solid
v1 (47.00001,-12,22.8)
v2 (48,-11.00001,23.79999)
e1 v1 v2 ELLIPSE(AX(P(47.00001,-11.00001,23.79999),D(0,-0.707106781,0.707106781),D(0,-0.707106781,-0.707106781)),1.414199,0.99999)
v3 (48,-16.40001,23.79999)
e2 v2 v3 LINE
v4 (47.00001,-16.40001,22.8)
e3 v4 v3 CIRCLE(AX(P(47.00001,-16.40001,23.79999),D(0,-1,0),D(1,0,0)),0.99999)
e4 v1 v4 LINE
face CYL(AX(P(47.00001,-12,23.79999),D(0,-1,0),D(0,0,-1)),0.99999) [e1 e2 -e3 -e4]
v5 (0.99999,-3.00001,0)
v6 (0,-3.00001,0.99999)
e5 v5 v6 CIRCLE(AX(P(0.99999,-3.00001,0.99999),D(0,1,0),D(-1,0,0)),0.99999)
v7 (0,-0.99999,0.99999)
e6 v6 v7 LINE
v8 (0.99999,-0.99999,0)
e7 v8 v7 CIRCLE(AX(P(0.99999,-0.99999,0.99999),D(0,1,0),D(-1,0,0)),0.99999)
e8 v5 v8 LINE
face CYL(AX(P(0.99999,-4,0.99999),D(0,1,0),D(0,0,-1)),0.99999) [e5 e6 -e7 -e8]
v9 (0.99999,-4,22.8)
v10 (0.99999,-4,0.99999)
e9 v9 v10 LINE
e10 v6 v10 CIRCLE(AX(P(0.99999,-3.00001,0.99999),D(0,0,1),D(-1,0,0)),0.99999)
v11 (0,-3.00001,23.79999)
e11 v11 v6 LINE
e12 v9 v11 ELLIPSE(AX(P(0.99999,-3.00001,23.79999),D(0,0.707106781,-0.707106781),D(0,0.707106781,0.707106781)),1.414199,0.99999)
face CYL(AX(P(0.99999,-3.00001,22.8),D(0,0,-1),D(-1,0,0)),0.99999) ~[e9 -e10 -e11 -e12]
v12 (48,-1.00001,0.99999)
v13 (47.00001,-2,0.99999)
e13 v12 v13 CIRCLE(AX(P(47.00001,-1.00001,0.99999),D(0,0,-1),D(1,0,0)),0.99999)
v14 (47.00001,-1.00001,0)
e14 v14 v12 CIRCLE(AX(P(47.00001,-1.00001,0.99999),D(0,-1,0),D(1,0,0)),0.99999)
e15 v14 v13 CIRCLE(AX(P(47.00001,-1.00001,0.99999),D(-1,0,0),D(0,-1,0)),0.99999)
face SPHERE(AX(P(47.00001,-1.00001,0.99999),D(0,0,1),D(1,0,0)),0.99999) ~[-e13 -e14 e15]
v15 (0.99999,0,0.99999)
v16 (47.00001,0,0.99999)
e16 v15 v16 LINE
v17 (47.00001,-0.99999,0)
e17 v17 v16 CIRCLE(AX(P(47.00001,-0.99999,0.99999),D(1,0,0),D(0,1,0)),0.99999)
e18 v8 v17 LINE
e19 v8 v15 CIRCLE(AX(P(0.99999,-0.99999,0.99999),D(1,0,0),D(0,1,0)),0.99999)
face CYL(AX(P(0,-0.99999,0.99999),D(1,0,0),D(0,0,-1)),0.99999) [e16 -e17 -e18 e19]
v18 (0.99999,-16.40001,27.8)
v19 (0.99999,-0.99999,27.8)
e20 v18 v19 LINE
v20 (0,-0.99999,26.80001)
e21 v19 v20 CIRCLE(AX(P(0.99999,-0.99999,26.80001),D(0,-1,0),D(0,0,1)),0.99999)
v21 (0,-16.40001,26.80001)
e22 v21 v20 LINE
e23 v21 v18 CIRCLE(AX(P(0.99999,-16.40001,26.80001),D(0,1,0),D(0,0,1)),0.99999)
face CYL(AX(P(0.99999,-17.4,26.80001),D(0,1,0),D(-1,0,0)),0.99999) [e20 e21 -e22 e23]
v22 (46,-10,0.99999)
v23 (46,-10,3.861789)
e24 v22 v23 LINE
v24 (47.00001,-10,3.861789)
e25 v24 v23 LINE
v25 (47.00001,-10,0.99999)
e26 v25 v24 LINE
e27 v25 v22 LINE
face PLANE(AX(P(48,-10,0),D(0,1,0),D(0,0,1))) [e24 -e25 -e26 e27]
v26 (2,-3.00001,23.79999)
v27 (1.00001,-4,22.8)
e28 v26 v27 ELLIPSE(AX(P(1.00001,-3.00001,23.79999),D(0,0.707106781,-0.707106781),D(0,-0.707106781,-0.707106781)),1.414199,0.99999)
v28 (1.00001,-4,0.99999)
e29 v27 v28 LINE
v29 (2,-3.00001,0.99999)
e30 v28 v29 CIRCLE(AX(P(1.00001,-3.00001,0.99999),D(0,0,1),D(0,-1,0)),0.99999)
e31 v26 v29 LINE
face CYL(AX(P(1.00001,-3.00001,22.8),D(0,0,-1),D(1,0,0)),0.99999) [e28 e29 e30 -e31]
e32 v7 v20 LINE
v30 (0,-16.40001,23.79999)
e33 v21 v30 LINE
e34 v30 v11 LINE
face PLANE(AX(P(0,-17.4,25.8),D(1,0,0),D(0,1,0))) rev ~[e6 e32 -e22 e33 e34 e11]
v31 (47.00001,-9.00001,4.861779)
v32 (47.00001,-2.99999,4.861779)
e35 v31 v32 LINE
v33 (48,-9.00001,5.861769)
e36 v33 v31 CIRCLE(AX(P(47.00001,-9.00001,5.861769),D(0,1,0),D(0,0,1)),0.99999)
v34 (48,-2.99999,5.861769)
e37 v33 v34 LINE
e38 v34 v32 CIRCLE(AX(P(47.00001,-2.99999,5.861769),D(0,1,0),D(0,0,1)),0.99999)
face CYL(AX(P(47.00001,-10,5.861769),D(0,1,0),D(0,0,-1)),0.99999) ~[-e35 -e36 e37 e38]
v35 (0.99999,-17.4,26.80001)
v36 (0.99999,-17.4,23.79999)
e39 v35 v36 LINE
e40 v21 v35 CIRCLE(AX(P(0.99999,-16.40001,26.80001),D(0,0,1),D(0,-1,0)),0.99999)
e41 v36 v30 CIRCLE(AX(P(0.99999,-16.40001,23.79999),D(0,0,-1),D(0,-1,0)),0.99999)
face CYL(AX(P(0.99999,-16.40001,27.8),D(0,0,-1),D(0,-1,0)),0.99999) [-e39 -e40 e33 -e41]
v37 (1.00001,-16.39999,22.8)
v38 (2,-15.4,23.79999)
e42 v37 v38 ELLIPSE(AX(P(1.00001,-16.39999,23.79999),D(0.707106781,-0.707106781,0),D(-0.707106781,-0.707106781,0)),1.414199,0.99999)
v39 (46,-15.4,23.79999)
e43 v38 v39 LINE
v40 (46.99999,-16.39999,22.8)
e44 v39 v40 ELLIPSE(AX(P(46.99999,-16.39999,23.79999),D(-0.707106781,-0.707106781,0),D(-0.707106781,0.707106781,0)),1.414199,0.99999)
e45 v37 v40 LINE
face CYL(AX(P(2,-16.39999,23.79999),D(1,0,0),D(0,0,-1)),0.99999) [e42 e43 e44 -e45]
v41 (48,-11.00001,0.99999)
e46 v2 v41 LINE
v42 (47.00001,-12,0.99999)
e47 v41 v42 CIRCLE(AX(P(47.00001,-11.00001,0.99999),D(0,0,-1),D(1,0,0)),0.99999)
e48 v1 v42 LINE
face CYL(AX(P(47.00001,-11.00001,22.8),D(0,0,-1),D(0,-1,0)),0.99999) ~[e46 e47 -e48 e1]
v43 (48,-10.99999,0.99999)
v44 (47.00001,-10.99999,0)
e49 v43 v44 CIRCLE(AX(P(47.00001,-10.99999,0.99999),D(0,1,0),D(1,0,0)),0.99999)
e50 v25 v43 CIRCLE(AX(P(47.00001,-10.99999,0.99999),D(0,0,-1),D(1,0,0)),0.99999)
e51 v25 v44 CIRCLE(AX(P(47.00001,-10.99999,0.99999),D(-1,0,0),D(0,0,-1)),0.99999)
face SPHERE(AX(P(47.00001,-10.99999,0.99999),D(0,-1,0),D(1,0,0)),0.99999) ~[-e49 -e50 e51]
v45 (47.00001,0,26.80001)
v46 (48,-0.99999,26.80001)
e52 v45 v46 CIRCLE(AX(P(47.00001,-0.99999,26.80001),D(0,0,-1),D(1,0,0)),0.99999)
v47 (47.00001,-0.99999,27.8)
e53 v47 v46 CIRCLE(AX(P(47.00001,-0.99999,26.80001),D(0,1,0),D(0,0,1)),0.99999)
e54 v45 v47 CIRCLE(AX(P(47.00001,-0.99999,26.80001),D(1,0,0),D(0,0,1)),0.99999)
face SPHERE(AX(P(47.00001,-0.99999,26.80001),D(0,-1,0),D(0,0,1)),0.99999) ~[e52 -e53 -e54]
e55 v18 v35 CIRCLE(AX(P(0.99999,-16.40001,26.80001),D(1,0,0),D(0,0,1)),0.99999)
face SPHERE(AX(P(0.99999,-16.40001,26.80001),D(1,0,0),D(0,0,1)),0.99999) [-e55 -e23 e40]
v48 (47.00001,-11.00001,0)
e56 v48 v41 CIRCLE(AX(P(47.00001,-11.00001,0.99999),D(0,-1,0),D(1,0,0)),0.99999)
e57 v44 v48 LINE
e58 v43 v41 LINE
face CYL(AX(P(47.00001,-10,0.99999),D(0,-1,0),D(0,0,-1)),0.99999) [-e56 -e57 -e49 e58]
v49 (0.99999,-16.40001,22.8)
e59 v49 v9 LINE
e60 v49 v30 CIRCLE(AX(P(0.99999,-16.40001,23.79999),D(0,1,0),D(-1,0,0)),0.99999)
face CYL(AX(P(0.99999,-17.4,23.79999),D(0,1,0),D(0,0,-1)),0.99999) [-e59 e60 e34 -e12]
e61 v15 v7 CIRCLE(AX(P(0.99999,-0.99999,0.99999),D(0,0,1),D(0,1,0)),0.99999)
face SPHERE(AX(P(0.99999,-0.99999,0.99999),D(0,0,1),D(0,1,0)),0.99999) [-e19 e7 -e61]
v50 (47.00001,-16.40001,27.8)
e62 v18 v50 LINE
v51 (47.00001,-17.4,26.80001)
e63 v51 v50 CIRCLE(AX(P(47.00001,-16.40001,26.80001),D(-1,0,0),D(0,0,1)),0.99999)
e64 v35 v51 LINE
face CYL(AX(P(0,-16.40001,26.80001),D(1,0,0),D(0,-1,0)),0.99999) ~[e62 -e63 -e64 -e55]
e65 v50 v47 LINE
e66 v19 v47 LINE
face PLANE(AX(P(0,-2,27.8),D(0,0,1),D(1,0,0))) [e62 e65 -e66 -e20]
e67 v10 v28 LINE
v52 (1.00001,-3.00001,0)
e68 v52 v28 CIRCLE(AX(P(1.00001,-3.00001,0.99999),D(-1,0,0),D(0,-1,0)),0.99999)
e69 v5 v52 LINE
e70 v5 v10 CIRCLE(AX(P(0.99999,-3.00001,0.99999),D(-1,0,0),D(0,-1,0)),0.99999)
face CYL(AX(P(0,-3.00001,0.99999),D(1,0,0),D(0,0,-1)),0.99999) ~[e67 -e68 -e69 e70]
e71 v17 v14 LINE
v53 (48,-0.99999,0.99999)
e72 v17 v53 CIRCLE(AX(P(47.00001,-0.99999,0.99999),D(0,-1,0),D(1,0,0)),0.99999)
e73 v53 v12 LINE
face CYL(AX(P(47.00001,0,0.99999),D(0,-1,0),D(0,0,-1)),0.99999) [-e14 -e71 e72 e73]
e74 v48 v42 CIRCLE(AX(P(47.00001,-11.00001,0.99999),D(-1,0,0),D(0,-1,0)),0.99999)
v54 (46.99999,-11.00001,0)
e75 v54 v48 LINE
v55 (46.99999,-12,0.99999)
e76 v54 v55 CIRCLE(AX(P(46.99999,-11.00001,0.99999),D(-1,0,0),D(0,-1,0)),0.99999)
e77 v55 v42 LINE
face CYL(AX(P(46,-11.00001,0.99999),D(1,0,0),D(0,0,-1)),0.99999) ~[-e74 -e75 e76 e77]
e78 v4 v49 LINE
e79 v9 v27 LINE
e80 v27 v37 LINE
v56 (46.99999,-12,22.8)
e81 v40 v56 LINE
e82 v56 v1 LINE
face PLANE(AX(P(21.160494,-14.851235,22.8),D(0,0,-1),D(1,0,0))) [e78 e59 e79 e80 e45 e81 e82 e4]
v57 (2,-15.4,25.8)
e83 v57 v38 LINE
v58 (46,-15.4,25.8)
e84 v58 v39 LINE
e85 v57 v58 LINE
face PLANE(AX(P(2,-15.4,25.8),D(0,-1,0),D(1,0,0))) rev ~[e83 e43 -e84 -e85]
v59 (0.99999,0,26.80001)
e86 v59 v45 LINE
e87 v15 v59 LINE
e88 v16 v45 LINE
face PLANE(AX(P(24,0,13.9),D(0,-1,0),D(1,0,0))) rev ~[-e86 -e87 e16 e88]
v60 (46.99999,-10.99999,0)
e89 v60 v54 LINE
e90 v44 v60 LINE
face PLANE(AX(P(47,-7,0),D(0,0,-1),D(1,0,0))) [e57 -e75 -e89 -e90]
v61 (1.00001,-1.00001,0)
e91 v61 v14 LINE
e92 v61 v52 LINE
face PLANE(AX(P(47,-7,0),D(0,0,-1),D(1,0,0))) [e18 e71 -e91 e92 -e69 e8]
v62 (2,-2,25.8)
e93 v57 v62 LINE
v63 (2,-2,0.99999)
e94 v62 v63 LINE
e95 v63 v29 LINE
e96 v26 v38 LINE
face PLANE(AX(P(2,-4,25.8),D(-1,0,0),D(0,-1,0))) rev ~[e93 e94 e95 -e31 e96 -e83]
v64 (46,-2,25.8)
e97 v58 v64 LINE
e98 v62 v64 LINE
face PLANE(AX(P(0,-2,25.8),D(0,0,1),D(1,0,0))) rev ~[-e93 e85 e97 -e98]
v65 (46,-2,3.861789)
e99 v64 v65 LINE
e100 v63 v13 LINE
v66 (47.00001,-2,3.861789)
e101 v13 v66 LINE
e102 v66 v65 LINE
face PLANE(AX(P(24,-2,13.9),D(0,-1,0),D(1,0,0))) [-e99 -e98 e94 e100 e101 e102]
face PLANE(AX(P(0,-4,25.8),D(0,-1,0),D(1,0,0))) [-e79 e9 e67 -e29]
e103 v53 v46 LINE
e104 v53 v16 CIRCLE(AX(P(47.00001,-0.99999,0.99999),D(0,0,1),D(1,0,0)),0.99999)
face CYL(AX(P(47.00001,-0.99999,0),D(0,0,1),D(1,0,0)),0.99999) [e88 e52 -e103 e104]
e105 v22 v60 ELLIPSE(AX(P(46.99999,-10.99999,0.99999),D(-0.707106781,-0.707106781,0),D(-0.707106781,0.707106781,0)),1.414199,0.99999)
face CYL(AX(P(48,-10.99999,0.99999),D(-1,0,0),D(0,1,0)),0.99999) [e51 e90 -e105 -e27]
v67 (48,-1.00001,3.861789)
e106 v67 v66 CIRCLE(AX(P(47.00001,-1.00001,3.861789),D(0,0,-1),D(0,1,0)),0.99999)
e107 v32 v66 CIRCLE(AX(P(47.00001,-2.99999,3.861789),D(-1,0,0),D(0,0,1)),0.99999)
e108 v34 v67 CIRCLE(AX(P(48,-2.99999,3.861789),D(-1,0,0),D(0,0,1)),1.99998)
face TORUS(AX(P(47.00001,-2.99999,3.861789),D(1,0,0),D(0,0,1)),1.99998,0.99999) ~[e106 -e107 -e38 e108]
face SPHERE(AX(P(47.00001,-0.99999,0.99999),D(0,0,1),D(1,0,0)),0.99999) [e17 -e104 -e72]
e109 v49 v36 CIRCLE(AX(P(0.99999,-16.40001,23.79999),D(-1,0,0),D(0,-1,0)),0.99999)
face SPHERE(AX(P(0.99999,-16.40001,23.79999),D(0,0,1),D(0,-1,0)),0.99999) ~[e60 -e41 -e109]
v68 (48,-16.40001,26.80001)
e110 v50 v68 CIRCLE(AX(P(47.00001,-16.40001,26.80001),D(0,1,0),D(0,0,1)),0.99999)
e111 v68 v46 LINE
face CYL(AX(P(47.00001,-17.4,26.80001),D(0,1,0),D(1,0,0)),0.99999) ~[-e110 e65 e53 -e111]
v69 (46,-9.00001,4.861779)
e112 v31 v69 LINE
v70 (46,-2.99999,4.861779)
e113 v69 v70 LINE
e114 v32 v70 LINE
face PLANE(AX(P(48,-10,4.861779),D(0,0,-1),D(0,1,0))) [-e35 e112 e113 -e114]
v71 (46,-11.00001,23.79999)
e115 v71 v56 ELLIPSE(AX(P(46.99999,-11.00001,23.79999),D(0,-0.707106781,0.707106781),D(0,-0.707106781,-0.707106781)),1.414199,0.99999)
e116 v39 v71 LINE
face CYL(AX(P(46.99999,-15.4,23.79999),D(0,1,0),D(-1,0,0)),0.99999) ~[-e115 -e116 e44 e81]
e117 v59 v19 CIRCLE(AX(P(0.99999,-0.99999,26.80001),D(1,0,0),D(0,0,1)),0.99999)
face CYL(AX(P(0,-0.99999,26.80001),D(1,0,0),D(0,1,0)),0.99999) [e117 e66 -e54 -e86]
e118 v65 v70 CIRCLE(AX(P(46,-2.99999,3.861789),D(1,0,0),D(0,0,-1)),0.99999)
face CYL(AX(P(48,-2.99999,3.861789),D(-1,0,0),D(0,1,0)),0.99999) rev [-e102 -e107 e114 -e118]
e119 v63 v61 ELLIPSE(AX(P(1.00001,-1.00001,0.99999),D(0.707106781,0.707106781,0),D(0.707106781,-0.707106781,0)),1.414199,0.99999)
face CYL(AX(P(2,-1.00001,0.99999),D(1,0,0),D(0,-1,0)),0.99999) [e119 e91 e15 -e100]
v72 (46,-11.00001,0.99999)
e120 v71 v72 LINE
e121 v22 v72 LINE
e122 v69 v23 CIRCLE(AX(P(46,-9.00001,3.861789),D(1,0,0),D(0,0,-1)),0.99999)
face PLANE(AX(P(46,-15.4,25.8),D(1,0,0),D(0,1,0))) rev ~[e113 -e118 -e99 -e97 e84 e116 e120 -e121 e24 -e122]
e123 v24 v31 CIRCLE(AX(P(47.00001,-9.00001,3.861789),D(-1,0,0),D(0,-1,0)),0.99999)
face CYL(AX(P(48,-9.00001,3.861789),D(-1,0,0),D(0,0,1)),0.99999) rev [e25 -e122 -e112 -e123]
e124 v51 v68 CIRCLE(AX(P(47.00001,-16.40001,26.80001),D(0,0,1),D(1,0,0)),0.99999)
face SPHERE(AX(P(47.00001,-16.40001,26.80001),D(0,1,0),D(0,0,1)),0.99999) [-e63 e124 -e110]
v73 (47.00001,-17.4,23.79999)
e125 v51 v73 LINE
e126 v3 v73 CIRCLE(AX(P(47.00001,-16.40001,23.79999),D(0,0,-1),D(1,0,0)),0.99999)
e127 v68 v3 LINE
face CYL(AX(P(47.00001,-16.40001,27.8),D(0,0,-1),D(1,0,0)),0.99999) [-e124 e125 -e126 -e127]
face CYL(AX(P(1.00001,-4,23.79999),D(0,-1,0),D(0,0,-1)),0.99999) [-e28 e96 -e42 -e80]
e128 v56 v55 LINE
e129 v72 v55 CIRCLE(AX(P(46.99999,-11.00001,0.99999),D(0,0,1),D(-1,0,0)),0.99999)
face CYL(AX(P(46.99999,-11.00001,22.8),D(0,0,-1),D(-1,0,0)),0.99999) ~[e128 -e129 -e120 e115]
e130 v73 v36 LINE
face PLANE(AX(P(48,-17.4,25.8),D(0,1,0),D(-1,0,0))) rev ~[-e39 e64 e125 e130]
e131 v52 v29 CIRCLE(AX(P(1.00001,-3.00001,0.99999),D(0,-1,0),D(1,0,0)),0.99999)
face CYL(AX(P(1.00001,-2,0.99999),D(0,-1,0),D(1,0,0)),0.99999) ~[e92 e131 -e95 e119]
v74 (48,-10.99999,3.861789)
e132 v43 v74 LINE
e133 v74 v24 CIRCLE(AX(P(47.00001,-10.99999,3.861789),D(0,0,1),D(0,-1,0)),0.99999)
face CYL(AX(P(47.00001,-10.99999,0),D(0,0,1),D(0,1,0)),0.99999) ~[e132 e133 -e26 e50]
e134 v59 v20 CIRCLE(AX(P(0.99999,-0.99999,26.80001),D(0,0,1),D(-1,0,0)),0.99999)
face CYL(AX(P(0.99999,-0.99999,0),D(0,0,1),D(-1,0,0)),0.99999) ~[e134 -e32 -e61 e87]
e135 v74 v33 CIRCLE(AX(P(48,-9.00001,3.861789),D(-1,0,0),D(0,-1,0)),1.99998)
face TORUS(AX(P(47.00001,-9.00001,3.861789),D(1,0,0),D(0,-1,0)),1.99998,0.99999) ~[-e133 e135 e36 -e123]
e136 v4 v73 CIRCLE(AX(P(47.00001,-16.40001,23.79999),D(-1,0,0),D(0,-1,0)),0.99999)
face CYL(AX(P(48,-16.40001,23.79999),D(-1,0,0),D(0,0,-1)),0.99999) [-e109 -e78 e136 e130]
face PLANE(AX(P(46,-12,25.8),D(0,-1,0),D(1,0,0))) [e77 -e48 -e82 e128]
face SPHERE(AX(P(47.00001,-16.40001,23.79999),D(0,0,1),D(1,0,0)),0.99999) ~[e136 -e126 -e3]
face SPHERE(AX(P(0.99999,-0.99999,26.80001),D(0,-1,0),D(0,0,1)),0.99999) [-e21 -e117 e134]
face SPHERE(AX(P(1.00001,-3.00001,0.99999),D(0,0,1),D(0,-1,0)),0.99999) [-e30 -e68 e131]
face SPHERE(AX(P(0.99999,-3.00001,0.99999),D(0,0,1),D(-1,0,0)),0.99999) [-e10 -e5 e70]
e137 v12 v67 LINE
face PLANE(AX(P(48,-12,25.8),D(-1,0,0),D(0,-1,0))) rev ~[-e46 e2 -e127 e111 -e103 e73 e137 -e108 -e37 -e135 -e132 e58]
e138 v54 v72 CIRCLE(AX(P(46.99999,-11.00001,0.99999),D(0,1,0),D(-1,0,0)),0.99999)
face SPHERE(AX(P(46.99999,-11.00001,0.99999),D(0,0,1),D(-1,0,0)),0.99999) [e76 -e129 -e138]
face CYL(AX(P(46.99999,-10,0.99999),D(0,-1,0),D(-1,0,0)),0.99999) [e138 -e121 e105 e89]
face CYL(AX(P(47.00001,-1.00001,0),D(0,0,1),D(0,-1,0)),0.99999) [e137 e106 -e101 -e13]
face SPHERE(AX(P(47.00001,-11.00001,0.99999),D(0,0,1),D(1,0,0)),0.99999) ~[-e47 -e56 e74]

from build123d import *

# Parameters (mm, degrees)
F0_W     = 48
F0_H     = 27.8
F1_DEPTH = 2
F2_W     = 48
F2_H     = 2
F3_DEPTH = 15.4
F4_W     = 2
F4_H     = 10
F4_H_2   = 2
F5_DEPTH = 25.8
F7_DEPTH = 3
F8_W     = 8
F8_H     = 4.8617787947
F9_DEPTH = 2
F10_R    = 0.99999


# Not quite as in the source:
# - a fillet or chamfer is up to 0.001 mm smaller than in the source, because OpenCascade refuses the exact size


with BuildPart() as f1:
    # F0 (on Front) → F1 (new body)
    with BuildSketch(Plane.XZ):
        with Locations((24, 13.9)):
            Rectangle(F0_W, F0_H)
    extrude(amount=F1_DEPTH)

    # F2 (on face) → F3 (join)
    with BuildSketch(Plane.XZ.offset(2)):
        with Locations((24, 26.8)):
            Rectangle(F2_W, F2_H)
    extrude(amount=F3_DEPTH)

    # F4 (on face) → F5 (join)
    with BuildSketch(Plane(origin=(0, 0, 25.8), x_dir=(1, 0, 0), z_dir=(0, 0, -1))):
        with Locations((47, 7)):
            Rectangle(F4_W, F4_H)
        with Locations((1, 3)):
            Rectangle(F4_W, F4_H_2)
    extrude(amount=F5_DEPTH)

    # F6 (on face) → F7 (join)
    with BuildSketch(Plane(origin=(0, 0, 25.8), x_dir=(1, 0, 0), z_dir=(0, 0, -1))):
        Polygon((46, 15.4), (46, 12), (48, 12), (48, 17.4), (46, 17.4), (2, 17.4), (0, 17.4), (0, 4), (2, 4), (2, 15.4), align=None)
    extrude(amount=F7_DEPTH)

    # F8 (on face) → F9 (cut)
    with BuildSketch(Plane.YZ.offset(48)):
        with Locations((-6, 2.4308893974)):
            Rectangle(F8_W, F8_H)
    extrude(amount=-F9_DEPTH, mode=Mode.SUBTRACT)

    # F10 (radius 1 in the source; OpenCascade refuses exactly that, so slightly less here)
    f10_edges = [f1.edges().sort_by_distance(p)[0] for p in [
        (48, -8.7, 27.8),
        (24, -17.4, 27.8),
        (0, -8.7, 27.8),
        (24, 0, 27.8),
        (48, 0, 13.9),
        (48, -17.4, 25.3),
        (48, -14.7, 22.8),
        (48, -12, 11.4),
        (48, -11, 0),
        (48, -10, 2.430889),
        (48, -6, 4.861779),
        (48, -2, 2.430889),
        (48, -1, 0),
        (0, 0, 13.9),
        (24, 0, 0),
        (0, -17.4, 25.3),
        (24, -17.4, 22.8),
        (0, -10.7, 22.8),
        (0, -4, 11.4),
        (0, -2, 0),
        (47, -2, 4.861779),
        (47, -10, 4.861779),
        (46, -12, 11.4),
        (2, -4, 11.4),
        (2, -9.7, 22.8),
        (46, -13.7, 22.8),
        (24, -15.4, 22.8),
        (1, -4, 0),
        (25, -2, 0),
        (47, -10, 0),
        (46, -11, 0),
        (2, -3, 0),
        (47, -12, 0),
    ]]
    fillet(f10_edges, radius=F10_R)


solid = f1.part
